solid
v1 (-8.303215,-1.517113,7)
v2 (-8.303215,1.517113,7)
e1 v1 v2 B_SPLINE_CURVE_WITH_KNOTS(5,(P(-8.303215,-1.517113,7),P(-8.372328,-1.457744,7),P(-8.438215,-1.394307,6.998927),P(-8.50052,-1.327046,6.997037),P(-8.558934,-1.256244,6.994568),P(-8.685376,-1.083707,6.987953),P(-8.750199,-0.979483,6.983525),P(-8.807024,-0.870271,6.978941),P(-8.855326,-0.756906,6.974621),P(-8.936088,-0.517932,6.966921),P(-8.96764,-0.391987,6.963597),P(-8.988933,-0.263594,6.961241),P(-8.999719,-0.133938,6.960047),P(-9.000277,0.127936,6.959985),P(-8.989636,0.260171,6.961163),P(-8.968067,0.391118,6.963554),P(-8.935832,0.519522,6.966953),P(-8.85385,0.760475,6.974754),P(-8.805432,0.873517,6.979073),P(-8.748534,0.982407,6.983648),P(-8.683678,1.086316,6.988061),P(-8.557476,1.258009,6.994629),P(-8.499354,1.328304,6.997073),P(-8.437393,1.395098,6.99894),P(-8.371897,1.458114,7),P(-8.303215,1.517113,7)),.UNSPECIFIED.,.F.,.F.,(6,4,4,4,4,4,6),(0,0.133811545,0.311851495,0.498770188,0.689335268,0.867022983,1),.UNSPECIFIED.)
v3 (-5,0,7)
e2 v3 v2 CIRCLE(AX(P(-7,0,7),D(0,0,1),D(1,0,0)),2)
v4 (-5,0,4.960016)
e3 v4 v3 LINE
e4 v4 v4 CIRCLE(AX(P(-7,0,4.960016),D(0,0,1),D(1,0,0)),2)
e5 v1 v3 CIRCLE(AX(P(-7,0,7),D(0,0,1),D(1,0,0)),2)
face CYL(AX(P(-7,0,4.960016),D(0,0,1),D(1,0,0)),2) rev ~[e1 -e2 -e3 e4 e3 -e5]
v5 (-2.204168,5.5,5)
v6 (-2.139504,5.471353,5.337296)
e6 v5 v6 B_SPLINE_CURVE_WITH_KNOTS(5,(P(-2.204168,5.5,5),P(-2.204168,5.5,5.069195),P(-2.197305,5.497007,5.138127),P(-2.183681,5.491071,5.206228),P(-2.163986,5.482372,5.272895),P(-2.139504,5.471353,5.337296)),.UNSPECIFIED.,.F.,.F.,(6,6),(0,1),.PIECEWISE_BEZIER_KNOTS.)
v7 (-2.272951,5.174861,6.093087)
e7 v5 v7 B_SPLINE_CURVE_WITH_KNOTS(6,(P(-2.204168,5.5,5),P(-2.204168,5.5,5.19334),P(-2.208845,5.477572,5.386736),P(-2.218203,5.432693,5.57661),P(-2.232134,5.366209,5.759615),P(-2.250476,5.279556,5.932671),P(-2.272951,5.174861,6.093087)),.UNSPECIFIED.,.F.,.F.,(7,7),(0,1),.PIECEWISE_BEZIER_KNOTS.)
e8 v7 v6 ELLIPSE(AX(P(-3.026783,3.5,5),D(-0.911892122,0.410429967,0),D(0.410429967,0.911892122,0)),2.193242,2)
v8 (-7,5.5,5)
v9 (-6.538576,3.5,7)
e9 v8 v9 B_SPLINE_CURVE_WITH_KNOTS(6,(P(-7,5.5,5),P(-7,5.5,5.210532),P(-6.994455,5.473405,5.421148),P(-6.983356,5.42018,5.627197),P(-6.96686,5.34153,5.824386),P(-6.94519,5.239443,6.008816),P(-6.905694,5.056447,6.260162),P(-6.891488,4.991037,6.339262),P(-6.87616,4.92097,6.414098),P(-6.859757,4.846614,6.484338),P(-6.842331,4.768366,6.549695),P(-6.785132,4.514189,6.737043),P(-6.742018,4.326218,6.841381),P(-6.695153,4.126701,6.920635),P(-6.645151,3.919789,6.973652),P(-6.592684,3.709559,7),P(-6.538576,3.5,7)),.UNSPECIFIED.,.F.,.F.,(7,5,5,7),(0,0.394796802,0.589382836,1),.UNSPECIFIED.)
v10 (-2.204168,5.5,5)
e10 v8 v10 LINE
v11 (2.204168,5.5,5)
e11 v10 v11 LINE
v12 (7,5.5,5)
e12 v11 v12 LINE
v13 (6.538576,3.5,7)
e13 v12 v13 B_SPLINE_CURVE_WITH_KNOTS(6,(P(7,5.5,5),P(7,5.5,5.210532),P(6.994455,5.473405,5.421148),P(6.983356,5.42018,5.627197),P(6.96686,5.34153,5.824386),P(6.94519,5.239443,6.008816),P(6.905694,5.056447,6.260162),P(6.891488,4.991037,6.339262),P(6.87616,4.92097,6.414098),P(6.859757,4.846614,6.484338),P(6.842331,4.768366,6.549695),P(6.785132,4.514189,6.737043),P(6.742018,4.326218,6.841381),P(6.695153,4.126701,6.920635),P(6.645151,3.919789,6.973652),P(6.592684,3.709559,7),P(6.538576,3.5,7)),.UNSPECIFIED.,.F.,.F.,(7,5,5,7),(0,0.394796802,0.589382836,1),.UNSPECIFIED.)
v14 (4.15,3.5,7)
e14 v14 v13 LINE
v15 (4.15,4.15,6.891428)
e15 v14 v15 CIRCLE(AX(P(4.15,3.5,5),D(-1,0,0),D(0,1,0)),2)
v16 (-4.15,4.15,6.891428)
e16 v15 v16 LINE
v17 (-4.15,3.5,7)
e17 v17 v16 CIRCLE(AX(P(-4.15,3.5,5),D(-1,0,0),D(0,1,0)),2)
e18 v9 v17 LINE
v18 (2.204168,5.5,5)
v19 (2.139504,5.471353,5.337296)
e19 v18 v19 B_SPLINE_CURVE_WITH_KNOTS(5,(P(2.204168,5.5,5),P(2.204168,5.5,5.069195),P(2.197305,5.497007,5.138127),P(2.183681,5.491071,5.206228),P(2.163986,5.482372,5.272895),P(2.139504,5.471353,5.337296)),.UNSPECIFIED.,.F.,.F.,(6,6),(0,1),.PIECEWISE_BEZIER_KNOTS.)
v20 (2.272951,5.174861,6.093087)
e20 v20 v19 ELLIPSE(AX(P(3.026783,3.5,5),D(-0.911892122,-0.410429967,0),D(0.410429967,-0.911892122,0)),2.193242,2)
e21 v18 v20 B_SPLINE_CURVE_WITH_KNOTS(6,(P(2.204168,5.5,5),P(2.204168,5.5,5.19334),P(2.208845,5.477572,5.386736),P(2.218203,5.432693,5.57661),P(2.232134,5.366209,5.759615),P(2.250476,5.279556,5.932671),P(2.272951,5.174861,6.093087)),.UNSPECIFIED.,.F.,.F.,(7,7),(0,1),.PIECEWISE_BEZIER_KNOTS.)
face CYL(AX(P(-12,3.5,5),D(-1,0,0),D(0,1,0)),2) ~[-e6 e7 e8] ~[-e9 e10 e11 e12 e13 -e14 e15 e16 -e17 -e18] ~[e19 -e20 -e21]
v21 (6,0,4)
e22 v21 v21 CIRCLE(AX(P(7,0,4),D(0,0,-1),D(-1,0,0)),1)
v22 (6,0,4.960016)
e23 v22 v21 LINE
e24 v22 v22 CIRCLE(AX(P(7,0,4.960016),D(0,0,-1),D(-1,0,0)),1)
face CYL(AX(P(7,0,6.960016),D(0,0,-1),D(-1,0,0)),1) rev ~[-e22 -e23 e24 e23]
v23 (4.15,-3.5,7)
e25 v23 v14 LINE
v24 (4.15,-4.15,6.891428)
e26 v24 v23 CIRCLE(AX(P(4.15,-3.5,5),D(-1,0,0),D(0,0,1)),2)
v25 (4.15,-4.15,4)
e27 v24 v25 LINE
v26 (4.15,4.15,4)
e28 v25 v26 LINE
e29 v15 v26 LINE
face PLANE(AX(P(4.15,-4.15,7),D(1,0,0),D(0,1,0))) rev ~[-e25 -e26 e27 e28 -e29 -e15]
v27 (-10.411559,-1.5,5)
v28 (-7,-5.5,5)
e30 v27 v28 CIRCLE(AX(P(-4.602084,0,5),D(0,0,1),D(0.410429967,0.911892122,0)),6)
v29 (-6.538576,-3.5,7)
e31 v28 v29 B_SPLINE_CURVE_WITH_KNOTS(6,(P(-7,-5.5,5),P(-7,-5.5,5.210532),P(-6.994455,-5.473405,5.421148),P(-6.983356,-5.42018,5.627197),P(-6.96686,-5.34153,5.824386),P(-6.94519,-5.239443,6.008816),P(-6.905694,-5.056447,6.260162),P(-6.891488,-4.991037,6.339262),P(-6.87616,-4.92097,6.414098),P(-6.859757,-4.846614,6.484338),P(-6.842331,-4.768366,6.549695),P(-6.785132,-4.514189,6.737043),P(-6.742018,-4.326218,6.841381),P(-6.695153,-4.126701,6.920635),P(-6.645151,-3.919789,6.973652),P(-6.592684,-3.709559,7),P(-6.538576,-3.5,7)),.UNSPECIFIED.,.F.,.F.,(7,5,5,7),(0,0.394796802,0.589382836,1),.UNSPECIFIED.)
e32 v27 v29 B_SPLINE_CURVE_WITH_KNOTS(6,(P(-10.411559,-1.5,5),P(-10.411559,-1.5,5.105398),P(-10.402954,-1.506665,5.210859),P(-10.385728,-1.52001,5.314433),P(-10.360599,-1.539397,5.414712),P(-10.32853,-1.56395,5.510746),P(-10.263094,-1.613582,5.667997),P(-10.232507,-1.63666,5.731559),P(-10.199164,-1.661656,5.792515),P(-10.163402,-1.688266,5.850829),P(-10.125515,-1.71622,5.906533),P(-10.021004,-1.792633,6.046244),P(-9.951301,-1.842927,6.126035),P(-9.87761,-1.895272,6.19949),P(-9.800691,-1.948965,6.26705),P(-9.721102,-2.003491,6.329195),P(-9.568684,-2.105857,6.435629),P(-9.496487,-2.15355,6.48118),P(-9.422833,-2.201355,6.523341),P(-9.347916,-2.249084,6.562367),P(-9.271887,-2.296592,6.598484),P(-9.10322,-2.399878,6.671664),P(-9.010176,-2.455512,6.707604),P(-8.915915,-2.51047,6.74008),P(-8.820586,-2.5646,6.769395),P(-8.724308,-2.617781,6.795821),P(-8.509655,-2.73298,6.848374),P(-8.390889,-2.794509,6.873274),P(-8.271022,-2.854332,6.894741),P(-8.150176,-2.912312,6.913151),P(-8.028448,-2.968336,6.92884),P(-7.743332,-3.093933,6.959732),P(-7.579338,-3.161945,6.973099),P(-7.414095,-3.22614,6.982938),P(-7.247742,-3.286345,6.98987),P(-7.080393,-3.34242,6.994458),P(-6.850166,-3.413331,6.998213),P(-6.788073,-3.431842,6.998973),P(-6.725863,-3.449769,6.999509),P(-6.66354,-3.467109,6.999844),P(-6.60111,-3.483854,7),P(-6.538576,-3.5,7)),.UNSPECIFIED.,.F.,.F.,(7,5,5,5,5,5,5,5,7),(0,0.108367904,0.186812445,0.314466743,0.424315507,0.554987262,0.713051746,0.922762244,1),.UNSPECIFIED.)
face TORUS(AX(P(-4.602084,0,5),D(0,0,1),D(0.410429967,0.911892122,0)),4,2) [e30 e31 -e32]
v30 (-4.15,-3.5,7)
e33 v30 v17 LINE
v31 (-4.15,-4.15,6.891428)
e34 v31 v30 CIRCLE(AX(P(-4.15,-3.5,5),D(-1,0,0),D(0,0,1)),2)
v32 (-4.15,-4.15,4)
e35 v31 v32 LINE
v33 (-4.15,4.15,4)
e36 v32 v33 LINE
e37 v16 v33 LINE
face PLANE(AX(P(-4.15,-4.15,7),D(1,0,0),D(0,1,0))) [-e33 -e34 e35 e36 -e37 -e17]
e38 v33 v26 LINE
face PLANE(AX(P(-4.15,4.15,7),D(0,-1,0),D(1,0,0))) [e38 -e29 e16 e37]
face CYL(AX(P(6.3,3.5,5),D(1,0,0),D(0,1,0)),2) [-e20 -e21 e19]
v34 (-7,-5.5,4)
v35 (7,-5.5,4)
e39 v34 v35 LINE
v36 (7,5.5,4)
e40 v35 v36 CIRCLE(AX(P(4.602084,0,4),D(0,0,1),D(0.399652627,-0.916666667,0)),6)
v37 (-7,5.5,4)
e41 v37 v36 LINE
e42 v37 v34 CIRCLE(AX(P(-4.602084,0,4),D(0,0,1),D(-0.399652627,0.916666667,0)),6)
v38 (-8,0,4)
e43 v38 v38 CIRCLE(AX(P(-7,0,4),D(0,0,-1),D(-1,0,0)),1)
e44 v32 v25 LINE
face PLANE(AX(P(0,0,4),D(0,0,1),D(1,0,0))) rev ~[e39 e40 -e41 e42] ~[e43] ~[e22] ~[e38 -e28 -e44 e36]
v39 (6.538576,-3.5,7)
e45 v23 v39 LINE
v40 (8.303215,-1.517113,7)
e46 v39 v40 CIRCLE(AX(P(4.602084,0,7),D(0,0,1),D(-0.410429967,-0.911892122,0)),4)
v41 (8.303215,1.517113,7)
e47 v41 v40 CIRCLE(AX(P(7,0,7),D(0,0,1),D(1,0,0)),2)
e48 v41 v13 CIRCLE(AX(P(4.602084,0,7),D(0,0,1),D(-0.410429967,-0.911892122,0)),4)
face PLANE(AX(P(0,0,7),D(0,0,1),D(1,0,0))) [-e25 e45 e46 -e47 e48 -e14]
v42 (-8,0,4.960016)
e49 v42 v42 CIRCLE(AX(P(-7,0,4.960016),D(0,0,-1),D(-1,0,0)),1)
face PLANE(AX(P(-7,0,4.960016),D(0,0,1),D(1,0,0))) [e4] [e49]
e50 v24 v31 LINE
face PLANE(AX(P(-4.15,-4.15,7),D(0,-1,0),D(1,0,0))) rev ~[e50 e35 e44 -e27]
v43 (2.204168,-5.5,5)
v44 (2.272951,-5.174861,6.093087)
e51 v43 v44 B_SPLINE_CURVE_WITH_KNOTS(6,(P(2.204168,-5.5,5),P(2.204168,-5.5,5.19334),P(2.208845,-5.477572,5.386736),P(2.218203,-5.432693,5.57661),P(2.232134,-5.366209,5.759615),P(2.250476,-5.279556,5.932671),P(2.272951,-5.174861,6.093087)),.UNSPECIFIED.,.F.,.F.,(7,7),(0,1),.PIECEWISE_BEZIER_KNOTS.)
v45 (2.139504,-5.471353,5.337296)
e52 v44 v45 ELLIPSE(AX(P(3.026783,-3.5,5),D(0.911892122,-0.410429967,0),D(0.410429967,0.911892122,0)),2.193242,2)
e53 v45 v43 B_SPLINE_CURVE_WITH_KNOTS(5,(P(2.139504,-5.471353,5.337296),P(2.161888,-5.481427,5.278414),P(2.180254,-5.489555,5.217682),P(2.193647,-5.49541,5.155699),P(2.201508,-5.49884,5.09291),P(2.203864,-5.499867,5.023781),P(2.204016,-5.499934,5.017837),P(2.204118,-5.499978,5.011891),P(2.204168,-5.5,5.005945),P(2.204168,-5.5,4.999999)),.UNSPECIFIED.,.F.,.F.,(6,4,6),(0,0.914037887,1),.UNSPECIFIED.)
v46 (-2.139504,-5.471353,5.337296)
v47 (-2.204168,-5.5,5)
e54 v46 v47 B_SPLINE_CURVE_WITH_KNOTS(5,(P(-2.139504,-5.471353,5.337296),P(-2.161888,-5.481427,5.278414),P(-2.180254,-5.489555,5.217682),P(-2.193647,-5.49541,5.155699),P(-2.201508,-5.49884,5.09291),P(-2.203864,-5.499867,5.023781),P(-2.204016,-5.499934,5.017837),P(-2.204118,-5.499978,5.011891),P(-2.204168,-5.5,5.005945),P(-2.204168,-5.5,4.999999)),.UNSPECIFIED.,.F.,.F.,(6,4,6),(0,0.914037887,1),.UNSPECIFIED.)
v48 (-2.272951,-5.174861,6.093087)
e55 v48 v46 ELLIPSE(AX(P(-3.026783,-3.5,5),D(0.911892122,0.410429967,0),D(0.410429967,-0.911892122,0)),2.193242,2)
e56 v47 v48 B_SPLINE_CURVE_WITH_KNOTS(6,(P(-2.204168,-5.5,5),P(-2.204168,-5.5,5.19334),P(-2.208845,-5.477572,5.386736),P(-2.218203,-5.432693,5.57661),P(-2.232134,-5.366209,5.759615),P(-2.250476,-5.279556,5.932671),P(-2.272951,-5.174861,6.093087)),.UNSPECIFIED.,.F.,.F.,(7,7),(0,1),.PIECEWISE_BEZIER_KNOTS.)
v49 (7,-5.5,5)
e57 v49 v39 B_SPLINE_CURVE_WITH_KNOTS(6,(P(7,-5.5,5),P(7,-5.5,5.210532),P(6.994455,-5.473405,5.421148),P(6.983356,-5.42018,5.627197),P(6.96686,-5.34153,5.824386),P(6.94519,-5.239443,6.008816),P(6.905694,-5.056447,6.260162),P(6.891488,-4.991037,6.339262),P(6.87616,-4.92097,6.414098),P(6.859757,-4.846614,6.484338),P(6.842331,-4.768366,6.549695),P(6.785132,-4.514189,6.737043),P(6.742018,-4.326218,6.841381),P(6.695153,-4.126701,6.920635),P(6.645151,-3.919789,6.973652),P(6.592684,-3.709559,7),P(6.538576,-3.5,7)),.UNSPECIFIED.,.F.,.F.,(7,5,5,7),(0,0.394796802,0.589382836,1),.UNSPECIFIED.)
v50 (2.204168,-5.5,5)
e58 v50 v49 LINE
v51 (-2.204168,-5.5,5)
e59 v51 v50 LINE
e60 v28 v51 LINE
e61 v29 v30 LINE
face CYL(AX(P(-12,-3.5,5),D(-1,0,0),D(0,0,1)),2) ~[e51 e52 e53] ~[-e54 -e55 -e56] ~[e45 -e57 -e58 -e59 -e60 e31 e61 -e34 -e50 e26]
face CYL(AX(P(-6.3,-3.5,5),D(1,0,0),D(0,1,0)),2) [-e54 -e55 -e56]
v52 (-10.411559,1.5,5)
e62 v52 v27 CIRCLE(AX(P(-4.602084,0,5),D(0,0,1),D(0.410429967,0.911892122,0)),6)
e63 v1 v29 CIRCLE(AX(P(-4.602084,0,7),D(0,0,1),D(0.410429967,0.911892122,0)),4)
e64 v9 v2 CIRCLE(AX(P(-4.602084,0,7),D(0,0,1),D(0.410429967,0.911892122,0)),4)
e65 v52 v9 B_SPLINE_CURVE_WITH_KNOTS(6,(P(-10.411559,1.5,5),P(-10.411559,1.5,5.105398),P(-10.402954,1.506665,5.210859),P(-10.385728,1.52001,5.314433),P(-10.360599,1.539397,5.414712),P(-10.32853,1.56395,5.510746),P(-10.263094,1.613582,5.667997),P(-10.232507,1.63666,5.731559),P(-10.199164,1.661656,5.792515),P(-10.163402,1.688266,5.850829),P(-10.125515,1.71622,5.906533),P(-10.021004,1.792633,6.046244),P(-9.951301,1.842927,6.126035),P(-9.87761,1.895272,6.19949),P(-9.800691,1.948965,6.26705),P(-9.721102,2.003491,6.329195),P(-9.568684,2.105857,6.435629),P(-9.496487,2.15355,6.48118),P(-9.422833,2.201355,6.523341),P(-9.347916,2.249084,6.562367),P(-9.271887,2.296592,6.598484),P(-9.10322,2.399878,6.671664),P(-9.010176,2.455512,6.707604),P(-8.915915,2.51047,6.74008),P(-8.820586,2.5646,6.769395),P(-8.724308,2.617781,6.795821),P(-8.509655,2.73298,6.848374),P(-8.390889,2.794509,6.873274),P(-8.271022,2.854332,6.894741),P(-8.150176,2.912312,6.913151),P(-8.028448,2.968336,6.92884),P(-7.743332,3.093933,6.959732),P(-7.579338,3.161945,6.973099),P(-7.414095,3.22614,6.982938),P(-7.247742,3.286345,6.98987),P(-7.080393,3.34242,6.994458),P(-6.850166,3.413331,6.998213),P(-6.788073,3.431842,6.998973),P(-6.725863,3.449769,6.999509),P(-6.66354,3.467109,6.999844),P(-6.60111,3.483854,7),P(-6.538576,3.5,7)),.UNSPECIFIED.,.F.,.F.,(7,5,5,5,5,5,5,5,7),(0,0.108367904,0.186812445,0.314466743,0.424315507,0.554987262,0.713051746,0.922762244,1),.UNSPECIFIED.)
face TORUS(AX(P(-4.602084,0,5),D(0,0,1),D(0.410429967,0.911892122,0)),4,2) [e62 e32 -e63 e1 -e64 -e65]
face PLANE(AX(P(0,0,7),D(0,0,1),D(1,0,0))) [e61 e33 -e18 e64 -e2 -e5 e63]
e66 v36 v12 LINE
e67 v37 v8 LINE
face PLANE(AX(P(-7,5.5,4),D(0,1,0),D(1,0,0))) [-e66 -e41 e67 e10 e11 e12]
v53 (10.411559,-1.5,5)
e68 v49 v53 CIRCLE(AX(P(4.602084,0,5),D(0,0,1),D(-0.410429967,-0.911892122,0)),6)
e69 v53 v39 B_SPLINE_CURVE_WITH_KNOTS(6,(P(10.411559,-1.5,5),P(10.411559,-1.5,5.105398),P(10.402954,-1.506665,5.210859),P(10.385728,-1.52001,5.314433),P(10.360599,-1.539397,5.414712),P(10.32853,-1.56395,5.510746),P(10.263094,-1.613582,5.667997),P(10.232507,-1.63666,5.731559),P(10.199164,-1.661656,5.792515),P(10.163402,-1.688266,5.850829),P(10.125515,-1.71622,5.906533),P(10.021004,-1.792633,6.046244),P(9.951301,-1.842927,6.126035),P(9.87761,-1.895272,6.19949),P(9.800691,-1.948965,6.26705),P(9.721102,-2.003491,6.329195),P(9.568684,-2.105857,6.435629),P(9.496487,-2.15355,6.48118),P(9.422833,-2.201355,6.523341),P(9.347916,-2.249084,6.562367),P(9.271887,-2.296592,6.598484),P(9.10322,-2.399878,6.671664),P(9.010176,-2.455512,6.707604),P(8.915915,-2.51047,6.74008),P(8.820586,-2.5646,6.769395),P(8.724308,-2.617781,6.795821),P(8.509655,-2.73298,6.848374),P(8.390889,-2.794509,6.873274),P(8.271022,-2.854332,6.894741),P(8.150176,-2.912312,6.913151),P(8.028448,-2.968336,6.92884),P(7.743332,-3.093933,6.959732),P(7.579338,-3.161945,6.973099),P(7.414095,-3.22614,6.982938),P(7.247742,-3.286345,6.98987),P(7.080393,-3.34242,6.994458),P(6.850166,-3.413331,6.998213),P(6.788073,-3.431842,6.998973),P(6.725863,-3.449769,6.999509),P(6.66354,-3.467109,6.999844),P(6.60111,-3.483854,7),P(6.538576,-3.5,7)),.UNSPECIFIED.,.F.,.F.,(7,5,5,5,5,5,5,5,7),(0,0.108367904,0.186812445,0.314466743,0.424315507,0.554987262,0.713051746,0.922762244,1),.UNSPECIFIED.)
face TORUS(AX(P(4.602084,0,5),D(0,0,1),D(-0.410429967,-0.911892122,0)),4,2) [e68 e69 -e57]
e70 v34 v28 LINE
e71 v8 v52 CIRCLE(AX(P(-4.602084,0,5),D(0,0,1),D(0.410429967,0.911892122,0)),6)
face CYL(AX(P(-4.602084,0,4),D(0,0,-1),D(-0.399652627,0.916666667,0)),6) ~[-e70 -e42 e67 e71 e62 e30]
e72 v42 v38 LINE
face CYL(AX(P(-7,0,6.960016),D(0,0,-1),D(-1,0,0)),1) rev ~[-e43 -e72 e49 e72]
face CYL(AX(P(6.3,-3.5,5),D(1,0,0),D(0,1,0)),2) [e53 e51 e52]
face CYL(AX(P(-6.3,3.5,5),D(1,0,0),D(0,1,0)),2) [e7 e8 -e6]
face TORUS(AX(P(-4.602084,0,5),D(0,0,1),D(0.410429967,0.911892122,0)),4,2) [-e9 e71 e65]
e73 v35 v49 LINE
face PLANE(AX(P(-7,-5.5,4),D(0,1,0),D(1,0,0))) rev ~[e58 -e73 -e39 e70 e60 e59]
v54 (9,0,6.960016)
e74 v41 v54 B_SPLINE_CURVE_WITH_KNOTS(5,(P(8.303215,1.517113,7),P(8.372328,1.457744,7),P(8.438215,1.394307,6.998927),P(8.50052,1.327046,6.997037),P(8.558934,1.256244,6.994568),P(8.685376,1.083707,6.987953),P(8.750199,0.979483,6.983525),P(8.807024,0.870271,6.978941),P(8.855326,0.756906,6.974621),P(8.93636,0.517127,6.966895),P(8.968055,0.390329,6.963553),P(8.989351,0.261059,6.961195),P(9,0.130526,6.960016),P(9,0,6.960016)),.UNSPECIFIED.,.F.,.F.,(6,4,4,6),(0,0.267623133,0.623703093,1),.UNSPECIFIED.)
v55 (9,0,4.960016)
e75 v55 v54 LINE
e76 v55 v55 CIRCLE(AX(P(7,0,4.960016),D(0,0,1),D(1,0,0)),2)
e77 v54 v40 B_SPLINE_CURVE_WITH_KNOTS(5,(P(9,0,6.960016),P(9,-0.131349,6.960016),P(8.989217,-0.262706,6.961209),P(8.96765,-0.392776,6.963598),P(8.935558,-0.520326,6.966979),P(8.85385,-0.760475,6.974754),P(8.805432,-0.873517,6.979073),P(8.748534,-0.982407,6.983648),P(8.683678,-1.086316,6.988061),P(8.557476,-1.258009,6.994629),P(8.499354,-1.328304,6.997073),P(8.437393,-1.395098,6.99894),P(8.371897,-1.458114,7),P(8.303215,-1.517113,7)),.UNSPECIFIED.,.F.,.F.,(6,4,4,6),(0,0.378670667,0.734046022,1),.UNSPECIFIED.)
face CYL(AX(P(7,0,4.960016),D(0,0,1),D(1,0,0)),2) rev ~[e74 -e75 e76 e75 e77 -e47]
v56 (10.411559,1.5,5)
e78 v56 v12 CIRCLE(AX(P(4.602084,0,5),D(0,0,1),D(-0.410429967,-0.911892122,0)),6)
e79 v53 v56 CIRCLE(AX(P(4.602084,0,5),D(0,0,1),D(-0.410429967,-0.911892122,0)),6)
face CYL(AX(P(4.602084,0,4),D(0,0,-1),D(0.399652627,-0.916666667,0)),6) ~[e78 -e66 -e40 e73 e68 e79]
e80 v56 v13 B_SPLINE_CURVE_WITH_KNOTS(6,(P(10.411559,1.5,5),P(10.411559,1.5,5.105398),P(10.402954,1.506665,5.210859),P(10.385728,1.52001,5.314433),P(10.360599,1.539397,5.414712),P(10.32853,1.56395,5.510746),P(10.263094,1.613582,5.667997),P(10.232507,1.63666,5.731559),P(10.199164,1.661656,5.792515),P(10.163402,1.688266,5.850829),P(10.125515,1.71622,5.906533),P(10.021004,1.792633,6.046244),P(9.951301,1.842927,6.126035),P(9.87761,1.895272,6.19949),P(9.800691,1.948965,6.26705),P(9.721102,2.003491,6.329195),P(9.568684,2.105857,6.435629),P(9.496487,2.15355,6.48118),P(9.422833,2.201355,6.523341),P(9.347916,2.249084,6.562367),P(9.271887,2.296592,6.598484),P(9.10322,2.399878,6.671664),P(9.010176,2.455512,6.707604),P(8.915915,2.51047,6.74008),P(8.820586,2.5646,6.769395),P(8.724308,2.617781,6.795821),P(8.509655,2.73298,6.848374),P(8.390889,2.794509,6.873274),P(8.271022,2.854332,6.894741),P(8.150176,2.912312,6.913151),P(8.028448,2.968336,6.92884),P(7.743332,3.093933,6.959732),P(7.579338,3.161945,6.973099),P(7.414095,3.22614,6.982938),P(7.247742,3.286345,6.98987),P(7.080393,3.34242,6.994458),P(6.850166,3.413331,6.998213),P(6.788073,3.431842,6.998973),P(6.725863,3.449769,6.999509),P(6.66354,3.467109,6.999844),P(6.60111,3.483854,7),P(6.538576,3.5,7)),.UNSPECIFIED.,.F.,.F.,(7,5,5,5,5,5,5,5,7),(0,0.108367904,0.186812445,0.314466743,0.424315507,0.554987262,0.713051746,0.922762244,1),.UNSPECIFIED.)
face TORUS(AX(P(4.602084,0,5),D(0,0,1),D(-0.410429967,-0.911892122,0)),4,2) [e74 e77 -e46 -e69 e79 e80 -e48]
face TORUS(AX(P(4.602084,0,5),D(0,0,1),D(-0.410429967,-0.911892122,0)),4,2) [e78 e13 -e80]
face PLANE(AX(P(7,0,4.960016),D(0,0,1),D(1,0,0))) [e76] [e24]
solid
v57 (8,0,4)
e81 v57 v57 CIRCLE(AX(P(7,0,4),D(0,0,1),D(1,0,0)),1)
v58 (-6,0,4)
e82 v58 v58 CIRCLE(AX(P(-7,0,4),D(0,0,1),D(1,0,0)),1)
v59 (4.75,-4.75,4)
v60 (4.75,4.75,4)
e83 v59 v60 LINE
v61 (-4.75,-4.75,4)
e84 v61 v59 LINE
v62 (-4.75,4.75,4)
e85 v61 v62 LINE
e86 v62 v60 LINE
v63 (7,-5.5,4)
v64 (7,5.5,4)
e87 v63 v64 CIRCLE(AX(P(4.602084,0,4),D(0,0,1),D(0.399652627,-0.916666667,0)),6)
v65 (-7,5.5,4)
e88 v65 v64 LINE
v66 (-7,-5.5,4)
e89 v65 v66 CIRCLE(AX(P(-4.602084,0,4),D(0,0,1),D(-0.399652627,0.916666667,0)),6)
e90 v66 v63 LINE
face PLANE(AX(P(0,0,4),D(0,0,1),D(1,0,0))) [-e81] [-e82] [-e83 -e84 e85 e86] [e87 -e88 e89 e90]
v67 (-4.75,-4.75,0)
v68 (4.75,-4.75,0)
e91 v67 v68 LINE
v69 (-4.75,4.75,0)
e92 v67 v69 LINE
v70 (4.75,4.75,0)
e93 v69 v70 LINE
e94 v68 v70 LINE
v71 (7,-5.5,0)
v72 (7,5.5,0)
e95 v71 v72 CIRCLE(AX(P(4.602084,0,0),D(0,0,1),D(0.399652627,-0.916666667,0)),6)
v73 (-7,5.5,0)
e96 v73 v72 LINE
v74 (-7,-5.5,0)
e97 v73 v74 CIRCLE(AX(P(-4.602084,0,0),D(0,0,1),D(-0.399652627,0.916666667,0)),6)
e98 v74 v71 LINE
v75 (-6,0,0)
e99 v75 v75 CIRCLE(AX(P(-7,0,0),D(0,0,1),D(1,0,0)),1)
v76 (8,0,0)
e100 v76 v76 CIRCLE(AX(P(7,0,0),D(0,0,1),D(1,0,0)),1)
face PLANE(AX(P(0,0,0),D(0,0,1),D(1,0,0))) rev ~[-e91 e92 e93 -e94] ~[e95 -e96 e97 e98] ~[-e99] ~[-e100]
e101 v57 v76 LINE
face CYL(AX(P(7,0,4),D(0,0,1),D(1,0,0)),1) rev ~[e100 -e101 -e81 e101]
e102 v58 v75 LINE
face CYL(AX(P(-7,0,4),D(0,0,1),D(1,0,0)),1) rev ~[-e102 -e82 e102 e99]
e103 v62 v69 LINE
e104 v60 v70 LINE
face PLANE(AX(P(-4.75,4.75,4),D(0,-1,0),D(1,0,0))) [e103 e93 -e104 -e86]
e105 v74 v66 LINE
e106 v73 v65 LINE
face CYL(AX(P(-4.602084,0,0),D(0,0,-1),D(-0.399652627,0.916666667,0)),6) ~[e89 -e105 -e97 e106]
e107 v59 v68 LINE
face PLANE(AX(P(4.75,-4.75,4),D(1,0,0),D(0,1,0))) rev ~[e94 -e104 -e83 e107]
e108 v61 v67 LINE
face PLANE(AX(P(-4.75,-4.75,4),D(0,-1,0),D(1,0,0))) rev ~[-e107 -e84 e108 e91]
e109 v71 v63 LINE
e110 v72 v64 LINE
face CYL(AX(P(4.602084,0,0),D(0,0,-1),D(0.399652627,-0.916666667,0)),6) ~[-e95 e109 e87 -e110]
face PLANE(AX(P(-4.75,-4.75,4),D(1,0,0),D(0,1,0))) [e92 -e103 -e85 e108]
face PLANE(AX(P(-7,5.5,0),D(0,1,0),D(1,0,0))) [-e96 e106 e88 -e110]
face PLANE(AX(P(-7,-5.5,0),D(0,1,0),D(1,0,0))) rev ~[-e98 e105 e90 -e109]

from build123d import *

# Parameters (mm, degrees)
F0_W           = 14
F0_H           = 11
F1_DEPTH       = 4
F2_R           = 1
F2_W           = 9.5
F2_H           = 9.5
F3_DEPTH       = 5
F4_W           = 14
F4_H           = 11
F5_DEPTH       = 3
F6_W           = 8.3
F6_H           = 8.3
F7_DEPTH       = 3
F8_T1_DEPTH    = 24
F8_T6_ANGLE    = 228.4636950683
F8_S7_R        = 2
F8_T8_DEPTH    = 9
F8_S9_R        = 2
F8_T10_DEPTH   = 9
F8_T14_ANGLE   = 228.4636950683
F8_T19_ANGLE   = 228.4636950683
F8_S20_R       = 2
F8_T21_DEPTH   = 9
F8_S22_R       = 2
F8_T23_DEPTH   = 9
F8_T27_ANGLE   = 228.4636950683
F9_D           = 2
F9_DEPTH       = 20
F9_START       = 0.039984
F9_CBORE_D     = 4
F9_CBORE_DEPTH = 2
F9_TIP         = 0.600860619


# Not quite as in the source:
# - a fillet or chamfer that OpenCascade refuses, or shapes differently, is made with other operations: its cross-section is extruded or revolved along the edge and cut away or added


with BuildPart() as f1:
    # F0 (on Top) → F1 (new body)
    with BuildSketch(Plane.XY):
        Rectangle(F0_W, F0_H)
        with BuildLine():
            ThreePointArc((7, -5.5), (10.6020842383, 0), (7, 5.5))
            Line((7, 5.5), (7, -5.5))
        make_face()
        with BuildLine():
            Line((-7, -5.5), (-7, 5.5))
            ThreePointArc((-7, 5.5), (-10.6020842383, 0), (-7, -5.5))
        make_face()
    extrude(amount=F1_DEPTH)

    # F2 (on face) → F3 (cut)
    with BuildSketch(Plane.XY.offset(4)):
        with Locations((-7, 0)):
            Circle(F2_R)
        with Locations((7, 0)):
            Circle(F2_R)
        Rectangle(F2_W, F2_H)
    extrude(amount=-F3_DEPTH, mode=Mode.SUBTRACT)


with BuildPart() as f5:
    # F4 (on face) → F5 (new body)
    with BuildSketch(Plane.XY.offset(4)):
        Rectangle(F4_W, F4_H)
        with BuildLine():
            ThreePointArc((7, -5.5), (10.6020842383, 0), (7, 5.5))
            Line((7, 5.5), (7, -5.5))
        make_face()
        with BuildLine():
            Line((-7, -5.5), (-7, 5.5))
            ThreePointArc((-7, 5.5), (-10.6020842383, 0), (-7, -5.5))
        make_face()
    extrude(amount=F5_DEPTH)

    # F6 (on face) → F7 (cut)
    with BuildSketch(Plane.XY.offset(7)):
        Rectangle(F6_W, F6_H)
    extrude(amount=-F7_DEPTH, mode=Mode.SUBTRACT)

    # F8: fillet of radius 2 on 4 edges, made by hand

    # F8_s2 → F8_t1 (cut)
    with BuildSketch(Plane.YZ.offset(-12)):
        with BuildLine():
            ThreePointArc((5.5, 5), (4.9142135624, 6.4142135624), (3.5, 7))
            Line((3.5, 7), (5.5, 7))
            Line((5.5, 7), (5.5, 5))
        make_face()
        with BuildLine():
            ThreePointArc((-3.5, 7), (-4.9142135624, 6.4142135624), (-5.5, 5))
            Line((-5.5, 5), (-5.5, 7))
            Line((-5.5, 7), (-3.5, 7))
        make_face()
    extrude(amount=F8_T1_DEPTH, mode=Mode.SUBTRACT)


with BuildPart() as f8_tool4:
    # F8_s5 → F8_t6 (revolve)
    with BuildSketch(Plane(origin=(3.8268504556, -1.7224121907, 0), x_dir=(0, 0, 1), z_dir=(-0.9118921219, 0.4104299673, 0))):
        with BuildLine():
            ThreePointArc((5, -4.1111667166), (6.4142135624, -3.525380279), (7, -2.1111667166))
            Line((7, -2.1111667166), (7, -4.1111667166))
            Line((7, -4.1111667166), (5, -4.1111667166))
        make_face()
    revolve(axis=Axis((4.6020842383, 0, 7), (0, 0, 1)), revolution_arc=F8_T6_ANGLE)

    # F8_s7 → F8_t8 (cut, symmetric)
    with BuildSketch(Plane.YZ.offset(6.3)):
        with Locations((3.5, 5)):
            Circle(F8_S7_R)
    extrude(amount=F8_T8_DEPTH, both=True, mode=Mode.SUBTRACT)

    # F8_s9 → F8_t10 (cut, symmetric)
    with BuildSketch(Plane.YZ.offset(6.3)):
        with Locations((-3.5, 5)):
            Circle(F8_S9_R)
    extrude(amount=F8_T10_DEPTH, both=True, mode=Mode.SUBTRACT)


with BuildPart() as f5_1:
    add(f5.part)

    # F8_t3: cut F8_tool4
    add(f8_tool4.part, mode=Mode.SUBTRACT)


with BuildPart() as f8_tool12:
    # F8_s13 → F8_t14 (revolve)
    with BuildSketch(Plane(origin=(3.8268504556, -1.7224121907, 0), x_dir=(0, 0, 1), z_dir=(-0.9118921219, 0.4104299673, 0))):
        with BuildLine():
            ThreePointArc((5, -4.1111667166), (6.4142135624, -3.525380279), (7, -2.1111667166))
            Line((7, -2.1111667166), (7, -4.1111667166))
            Line((7, -4.1111667166), (5, -4.1111667166))
        make_face()
    revolve(axis=Axis((4.6020842383, 0, 7), (0, 0, 1)), revolution_arc=F8_T14_ANGLE)

    split(bisect_by=Plane.YZ.offset(4.15), keep=Keep.TOP)


with BuildPart() as f5_2:
    add(f5_1.part)

    # F8_t11: cut F8_tool12
    add(f8_tool12.part, mode=Mode.SUBTRACT)


with BuildPart() as f8_tool17:
    # F8_s18 → F8_t19 (revolve)
    with BuildSketch(Plane(origin=(-3.8268504556, 1.7224121907, 0), x_dir=(0, 0, 1), z_dir=(0.9118921219, -0.4104299673, 0))):
        with BuildLine():
            ThreePointArc((5, -4.1111667166), (6.4142135624, -3.525380279), (7, -2.1111667166))
            Line((7, -2.1111667166), (7, -4.1111667166))
            Line((7, -4.1111667166), (5, -4.1111667166))
        make_face()
    revolve(axis=Axis((-4.6020842383, 0, 7), (0, 0, 1)), revolution_arc=F8_T19_ANGLE)

    # F8_s20 → F8_t21 (cut, symmetric)
    with BuildSketch(Plane.YZ.offset(-6.3)):
        with Locations((3.5, 5)):
            Circle(F8_S20_R)
    extrude(amount=F8_T21_DEPTH, both=True, mode=Mode.SUBTRACT)

    # F8_s22 → F8_t23 (cut, symmetric)
    with BuildSketch(Plane.YZ.offset(-6.3)):
        with Locations((-3.5, 5)):
            Circle(F8_S22_R)
    extrude(amount=F8_T23_DEPTH, both=True, mode=Mode.SUBTRACT)


with BuildPart() as f5_3:
    add(f5_2.part)

    # F8_t16: cut F8_tool17
    add(f8_tool17.part, mode=Mode.SUBTRACT)


with BuildPart() as f8_tool25:
    # F8_s26 → F8_t27 (revolve)
    with BuildSketch(Plane(origin=(-3.8268504556, 1.7224121907, 0), x_dir=(0, 0, 1), z_dir=(0.9118921219, -0.4104299673, 0))):
        with BuildLine():
            ThreePointArc((5, -4.1111667166), (6.4142135624, -3.525380279), (7, -2.1111667166))
            Line((7, -2.1111667166), (7, -4.1111667166))
            Line((7, -4.1111667166), (5, -4.1111667166))
        make_face()
    revolve(axis=Axis((-4.6020842383, 0, 7), (0, 0, 1)), revolution_arc=F8_T27_ANGLE)

    split(bisect_by=Plane.YZ.offset(-4.15), keep=Keep.BOTTOM)


with BuildPart() as f5_4:
    add(f5_3.part)

    # F8_t24: cut F8_tool25
    add(f8_tool25.part, mode=Mode.SUBTRACT)

    # F9
    # its depths count from where the whole tool has entered the part; down to there all is cleared
    with Locations(Plane.XY.offset(7).offset(-F9_START)):
        with Locations((7, 0), (-7, 0)):
            CounterBoreHole(F9_D / 2, F9_CBORE_D / 2, F9_CBORE_DEPTH, depth=F9_DEPTH)
            with Locations((0, 0, -(F9_DEPTH + F9_TIP / 2))):  # 118° drill point
                Cone(0, F9_D / 2, F9_TIP, mode=Mode.SUBTRACT)


solid = Compound([f1.part, f5_4.part])
